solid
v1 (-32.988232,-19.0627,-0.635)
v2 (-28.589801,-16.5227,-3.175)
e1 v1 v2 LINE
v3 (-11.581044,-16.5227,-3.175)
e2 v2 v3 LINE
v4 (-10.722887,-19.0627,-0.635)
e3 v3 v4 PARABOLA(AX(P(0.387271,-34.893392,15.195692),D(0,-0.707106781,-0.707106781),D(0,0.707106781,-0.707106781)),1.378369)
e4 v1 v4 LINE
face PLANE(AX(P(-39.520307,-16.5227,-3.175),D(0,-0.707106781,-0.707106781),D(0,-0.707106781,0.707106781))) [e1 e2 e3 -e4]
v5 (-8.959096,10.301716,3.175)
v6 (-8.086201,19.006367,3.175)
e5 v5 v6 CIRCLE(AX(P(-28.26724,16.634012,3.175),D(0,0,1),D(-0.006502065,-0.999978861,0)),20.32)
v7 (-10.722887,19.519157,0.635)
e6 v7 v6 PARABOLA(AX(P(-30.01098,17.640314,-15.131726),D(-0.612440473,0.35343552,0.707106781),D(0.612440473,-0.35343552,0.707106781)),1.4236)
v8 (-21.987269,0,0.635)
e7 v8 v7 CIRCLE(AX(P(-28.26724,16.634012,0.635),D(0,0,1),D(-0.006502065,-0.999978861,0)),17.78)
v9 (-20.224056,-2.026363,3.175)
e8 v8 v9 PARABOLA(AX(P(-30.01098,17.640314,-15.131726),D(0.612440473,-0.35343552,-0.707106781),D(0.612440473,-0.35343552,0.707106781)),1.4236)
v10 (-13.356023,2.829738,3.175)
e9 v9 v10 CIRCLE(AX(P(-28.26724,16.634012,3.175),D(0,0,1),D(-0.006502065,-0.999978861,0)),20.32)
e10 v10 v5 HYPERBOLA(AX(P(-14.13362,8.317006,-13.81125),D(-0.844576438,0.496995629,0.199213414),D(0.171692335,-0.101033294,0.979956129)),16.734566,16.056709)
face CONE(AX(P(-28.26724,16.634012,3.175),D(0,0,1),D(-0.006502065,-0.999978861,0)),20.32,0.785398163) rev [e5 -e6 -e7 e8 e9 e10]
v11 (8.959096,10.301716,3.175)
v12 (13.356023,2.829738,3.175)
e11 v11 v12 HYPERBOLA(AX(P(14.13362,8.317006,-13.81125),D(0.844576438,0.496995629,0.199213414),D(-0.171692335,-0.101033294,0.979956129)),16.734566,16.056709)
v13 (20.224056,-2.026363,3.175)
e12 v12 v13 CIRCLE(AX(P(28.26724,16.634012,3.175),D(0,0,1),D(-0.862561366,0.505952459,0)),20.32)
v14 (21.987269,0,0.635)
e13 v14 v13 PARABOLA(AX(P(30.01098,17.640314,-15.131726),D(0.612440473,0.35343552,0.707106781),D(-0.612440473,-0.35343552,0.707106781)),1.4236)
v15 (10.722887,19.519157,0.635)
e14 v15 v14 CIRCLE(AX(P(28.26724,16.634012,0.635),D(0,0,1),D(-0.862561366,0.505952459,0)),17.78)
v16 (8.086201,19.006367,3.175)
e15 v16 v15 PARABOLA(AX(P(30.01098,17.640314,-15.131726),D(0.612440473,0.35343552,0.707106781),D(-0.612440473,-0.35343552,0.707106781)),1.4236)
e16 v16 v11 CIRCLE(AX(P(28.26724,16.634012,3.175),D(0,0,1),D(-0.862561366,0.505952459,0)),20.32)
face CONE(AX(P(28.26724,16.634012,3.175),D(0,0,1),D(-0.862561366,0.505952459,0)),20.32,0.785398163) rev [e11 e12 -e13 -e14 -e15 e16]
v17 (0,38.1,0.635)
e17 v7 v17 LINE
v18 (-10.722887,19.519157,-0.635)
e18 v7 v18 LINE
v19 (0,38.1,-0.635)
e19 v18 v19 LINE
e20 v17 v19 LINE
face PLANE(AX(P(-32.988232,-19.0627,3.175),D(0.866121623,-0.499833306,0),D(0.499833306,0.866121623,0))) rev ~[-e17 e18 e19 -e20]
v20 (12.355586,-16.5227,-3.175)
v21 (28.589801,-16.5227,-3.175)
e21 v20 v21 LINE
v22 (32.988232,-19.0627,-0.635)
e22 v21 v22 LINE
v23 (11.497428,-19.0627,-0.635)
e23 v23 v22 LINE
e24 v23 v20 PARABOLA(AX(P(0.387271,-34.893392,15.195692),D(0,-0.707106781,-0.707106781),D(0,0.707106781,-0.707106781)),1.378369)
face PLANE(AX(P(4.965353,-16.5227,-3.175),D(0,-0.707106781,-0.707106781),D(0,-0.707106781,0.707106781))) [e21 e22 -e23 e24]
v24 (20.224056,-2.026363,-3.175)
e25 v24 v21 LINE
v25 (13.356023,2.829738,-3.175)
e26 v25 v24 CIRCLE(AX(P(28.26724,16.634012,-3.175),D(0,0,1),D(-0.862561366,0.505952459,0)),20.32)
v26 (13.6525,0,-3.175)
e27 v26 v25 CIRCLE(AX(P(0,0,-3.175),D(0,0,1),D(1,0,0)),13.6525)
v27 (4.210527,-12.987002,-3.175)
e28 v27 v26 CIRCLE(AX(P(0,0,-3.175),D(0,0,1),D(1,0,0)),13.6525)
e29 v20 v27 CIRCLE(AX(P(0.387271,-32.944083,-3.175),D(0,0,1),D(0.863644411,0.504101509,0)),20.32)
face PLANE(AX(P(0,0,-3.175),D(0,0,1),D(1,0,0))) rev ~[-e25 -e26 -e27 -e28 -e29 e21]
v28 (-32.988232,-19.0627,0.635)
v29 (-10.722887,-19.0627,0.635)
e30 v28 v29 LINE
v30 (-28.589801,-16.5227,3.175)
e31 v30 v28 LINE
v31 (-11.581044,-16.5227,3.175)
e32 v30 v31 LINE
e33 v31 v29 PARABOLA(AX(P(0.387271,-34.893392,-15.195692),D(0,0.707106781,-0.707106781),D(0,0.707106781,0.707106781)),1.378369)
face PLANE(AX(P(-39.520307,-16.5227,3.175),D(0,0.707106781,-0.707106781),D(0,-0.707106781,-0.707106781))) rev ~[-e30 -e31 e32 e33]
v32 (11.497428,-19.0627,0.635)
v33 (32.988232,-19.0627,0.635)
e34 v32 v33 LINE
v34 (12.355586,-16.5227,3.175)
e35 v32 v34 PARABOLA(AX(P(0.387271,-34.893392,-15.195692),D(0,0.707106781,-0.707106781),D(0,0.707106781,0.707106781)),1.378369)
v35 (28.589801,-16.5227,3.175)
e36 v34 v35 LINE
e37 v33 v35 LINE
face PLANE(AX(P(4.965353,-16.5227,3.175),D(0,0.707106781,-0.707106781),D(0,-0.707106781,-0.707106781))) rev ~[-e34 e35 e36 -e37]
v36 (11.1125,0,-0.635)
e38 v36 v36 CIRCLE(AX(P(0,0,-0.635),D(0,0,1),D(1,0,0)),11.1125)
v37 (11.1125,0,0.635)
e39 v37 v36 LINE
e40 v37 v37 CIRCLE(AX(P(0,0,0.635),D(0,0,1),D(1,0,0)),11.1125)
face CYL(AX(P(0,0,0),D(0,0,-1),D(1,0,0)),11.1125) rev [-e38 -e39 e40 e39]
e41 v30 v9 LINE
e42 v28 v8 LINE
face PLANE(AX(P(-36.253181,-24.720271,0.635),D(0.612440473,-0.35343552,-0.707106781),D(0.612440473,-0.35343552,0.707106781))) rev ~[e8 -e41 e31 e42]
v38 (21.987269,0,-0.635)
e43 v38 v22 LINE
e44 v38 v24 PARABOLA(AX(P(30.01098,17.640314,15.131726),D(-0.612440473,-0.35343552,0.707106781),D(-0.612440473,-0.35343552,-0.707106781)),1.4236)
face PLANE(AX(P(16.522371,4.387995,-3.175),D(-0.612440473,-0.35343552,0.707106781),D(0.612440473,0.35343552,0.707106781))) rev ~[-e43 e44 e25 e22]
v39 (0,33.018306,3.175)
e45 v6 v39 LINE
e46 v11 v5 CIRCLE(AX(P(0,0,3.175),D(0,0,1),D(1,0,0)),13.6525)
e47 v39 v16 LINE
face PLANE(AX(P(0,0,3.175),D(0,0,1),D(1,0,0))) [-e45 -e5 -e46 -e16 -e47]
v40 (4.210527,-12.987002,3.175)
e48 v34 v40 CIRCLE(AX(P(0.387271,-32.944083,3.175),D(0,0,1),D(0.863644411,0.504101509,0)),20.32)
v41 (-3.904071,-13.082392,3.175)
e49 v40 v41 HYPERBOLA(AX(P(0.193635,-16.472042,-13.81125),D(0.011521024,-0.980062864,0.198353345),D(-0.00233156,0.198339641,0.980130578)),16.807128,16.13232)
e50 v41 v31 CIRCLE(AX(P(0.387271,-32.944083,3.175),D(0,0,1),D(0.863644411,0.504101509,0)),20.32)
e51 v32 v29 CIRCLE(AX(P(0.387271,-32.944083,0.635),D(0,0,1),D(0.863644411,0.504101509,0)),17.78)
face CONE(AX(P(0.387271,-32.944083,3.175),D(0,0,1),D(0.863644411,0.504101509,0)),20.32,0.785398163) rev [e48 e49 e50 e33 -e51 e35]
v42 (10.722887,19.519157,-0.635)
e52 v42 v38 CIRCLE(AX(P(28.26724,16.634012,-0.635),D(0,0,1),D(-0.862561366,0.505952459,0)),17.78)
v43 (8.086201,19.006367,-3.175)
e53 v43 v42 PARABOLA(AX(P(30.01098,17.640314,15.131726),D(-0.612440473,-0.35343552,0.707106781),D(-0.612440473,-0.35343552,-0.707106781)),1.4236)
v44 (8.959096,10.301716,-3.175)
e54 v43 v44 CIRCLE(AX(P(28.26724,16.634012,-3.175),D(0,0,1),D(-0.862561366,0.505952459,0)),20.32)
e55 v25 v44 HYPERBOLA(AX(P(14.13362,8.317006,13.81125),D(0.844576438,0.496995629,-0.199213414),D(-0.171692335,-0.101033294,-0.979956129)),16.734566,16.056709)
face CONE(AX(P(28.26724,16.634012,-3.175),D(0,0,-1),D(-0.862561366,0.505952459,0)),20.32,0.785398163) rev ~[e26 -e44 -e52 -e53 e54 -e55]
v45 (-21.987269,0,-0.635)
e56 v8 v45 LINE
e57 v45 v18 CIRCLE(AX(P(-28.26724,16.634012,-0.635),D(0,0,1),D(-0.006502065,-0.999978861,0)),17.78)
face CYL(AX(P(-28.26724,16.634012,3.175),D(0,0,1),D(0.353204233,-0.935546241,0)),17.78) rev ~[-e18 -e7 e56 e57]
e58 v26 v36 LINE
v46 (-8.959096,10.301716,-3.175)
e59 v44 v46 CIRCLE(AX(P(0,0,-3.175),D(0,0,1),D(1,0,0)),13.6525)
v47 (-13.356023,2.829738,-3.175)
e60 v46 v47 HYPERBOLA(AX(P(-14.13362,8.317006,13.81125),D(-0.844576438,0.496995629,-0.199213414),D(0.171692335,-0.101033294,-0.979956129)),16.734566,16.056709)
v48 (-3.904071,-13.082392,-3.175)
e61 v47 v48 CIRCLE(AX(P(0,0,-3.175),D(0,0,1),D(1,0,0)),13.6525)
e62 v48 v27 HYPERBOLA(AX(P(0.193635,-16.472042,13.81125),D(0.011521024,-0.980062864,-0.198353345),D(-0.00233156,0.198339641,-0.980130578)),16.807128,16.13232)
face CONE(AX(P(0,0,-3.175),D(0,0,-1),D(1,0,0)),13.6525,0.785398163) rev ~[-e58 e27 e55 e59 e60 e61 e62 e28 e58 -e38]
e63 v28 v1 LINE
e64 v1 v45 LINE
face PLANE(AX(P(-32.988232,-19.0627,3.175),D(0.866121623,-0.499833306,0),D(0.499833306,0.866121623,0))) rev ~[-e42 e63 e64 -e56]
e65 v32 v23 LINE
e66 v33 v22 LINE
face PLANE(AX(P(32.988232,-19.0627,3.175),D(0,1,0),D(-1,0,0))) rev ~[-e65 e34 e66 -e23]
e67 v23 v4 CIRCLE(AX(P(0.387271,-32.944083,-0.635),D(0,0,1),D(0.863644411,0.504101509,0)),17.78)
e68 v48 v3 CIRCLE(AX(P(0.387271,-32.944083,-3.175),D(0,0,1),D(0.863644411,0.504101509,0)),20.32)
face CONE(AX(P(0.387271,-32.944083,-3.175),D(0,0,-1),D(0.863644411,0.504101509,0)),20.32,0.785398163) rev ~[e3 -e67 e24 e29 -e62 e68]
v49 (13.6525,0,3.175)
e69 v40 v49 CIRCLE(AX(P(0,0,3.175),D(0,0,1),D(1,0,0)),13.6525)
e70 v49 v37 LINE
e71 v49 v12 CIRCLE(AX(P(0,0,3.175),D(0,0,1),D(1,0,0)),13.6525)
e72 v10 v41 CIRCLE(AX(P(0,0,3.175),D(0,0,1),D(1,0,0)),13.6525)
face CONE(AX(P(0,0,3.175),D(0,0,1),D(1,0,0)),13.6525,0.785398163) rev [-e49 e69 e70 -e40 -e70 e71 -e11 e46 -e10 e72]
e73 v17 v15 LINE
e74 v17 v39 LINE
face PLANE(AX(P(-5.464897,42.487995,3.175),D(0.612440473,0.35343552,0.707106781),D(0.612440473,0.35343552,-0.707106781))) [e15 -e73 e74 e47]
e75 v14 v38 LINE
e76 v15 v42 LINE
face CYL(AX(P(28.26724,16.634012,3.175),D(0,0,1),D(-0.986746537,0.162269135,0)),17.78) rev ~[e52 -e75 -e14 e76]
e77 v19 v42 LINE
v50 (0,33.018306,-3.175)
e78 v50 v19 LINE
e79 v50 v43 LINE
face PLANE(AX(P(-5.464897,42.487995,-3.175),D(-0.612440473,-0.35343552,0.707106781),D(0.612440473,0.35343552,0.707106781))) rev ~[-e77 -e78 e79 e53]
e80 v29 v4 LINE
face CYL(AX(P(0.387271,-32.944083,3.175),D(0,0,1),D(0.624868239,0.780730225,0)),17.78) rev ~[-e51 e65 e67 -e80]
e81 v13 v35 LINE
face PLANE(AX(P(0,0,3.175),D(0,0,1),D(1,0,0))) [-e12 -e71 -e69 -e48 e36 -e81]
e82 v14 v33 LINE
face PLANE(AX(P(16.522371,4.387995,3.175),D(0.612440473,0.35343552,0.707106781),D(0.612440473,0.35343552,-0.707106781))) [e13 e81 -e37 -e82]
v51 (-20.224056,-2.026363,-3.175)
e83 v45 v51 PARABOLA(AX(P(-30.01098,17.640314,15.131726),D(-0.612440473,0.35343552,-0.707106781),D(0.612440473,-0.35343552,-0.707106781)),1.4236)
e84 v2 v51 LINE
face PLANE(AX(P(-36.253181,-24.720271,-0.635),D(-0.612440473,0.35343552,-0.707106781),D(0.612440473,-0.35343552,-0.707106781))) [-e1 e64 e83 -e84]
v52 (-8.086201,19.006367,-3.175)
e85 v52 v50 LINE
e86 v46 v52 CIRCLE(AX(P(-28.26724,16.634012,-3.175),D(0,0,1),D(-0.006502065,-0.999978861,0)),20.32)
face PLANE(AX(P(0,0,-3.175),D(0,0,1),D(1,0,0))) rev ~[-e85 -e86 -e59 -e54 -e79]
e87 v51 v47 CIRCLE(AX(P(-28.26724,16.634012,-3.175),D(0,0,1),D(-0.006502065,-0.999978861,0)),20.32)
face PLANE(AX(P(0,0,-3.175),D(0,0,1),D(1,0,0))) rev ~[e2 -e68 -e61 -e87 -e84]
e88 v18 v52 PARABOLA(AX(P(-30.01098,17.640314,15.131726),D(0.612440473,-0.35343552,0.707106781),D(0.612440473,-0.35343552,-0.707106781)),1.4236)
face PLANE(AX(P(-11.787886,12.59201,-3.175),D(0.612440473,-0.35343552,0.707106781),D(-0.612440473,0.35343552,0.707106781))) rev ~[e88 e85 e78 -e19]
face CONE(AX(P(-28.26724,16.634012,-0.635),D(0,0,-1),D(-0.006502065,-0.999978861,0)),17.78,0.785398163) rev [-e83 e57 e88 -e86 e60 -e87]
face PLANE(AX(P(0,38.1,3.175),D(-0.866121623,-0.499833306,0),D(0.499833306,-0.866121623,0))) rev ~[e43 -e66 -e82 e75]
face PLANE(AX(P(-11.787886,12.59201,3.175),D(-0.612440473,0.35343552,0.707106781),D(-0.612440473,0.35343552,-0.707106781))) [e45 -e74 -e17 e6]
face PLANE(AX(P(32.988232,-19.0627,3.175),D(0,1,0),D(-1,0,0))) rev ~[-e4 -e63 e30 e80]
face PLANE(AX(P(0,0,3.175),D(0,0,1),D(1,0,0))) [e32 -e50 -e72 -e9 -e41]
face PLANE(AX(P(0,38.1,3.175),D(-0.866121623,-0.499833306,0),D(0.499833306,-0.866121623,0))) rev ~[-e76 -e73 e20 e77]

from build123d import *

# Parameters (mm, degrees)
F0_R          = 38.1
F0_R_2        = 11.1125
F1_DEPTH      = 3.175
F1_DEPTH_BACK = 3.175
F3_DEPTH      = 25.4
F5_DEPTH      = 25.4
F6_T1_DEPTH   = 34.5170750052
F6_T3_DEPTH   = 35.0734141938
F6_T5_DEPTH   = 34.5549539208
F6_T7_DEPTH   = 35.3294952256
F6_T9_DEPTH   = 35.0734141938
F6_T11_DEPTH  = 34.5170750052
F6_T14_ANGLE  = 120.7671426779
F6_T16_ANGLE  = 119.4565466951
F6_T18_ANGLE  = 120.7671426779
F6_T22_ANGLE  = 120.7671426779
F6_T24_ANGLE  = 119.4565466951
F6_T26_ANGLE  = 120.7671426779


# Not quite as in the source:
# - a fillet or chamfer that OpenCascade refuses, or shapes differently, is made with other operations: its cross-section is extruded or revolved along the edge and cut away or added


with BuildPart() as f1:
    # F0 (on Top) → F1 (new body, two sides)
    with BuildSketch(Plane.XY) as f1_sk:
        Circle(F0_R)
        Circle(F0_R_2, mode=Mode.SUBTRACT)
    extrude(amount=F1_DEPTH)
    extrude(f1_sk.sketch, amount=-F1_DEPTH_BACK)

    # F2 (on face) → F3 (cut)
    with BuildSketch(Plane.XY.offset(3.175)):
        with BuildLine():
            Line((-32.9882322762, -19.0627), (0, 38.1))
            ThreePointArc((0, 38.1), (-32.9992338547, 19.0436489413), (-32.9882322762, -19.0627))
        make_face()
        with BuildLine():
            Line((32.9882322762, -19.0627), (-32.9882322762, -19.0627))
            ThreePointArc((-32.9882322762, -19.0627), (0, -38.1), (32.9882322762, -19.0627))
        make_face()
        with BuildLine():
            ThreePointArc((38.1, 0), (26.9407683632, 26.9407683632), (0, 38.1))
            Line((0, 38.1), (32.9882322762, -19.0627))
            ThreePointArc((32.9882322762, -19.0627), (36.7998753376, -9.8680887277), (38.1, 0))
        make_face()
    extrude(amount=-F3_DEPTH, mode=Mode.SUBTRACT)

    # F4 (on face) → F5 (cut)
    with BuildSketch(Plane.XY.offset(3.175)):
        with BuildLine():
            Line((-10.7228866295, 19.5191574013), (-21.9872687911, 0))
            ThreePointArc((-21.9872687911, 0), (-12.8675975863, 7.7469760001), (-10.7228866295, 19.5191574013))
        make_face()
        with BuildLine():
            Line((21.9872687911, 0), (10.7228866295, 19.5191574013))
            ThreePointArc((10.7228866295, 19.5191574013), (12.8675975863, 7.7469760001), (21.9872687911, 0))
        make_face()
        with BuildLine():
            ThreePointArc((11.4974279343, -19.0627), (0.3872706524, -15.1640834027), (-10.7228866295, -19.0627))
            Line((-10.7228866295, -19.0627), (11.4974279343, -19.0627))
        make_face()
    extrude(amount=-F5_DEPTH, mode=Mode.SUBTRACT)

    # F6: chamfer of 2.54 on 20 edges, made by hand

    # F6_s2 → F6_t1 (cut)
    with BuildSketch(Plane(origin=(-19.7590646722, 34.2389212213, 0), x_dir=(0, 0, 1), z_dir=(0.4998333055, -0.8661216235, 0))):
        Polygon((3.175, -16.5036489413), (0.635, -19.0436489413), (3.175, -19.0436489413), align=None)
        Polygon((-3.175, -16.5036489413), (-0.635, -19.0436489413), (-3.175, -19.0436489413), align=None)
    extrude(amount=F6_T1_DEPTH, mode=Mode.SUBTRACT)

    # F6_s4 → F6_t3 (cut)
    with BuildSketch(Plane(origin=(2.2282041189, -3.8610787787, 0), x_dir=(0, 0, 1), z_dir=(0.4998333055, -0.8661216235, 0))):
        Polygon((3.175, -16.5036489413), (0.635, -19.0436489413), (3.175, -19.0436489413), align=None)
        Polygon((-3.175, -16.5036489413), (-0.635, -19.0436489413), (-3.175, -19.0436489413), align=None)
    extrude(amount=F6_T3_DEPTH, mode=Mode.SUBTRACT)

    # F6_s6 → F6_t5 (cut)
    with BuildSketch(Plane.YZ.offset(4.9653531448)):
        Polygon((-16.5227, 3.175), (-19.0627, 0.635), (-19.0627, 3.175), align=None)
        Polygon((-16.5227, -3.175), (-19.0627, -0.635), (-19.0627, -3.175), align=None)
    extrude(amount=F6_T5_DEPTH, mode=Mode.SUBTRACT)

    # F6_s8 → F6_t7 (cut)
    with BuildSketch(Plane.YZ.offset(-39.5203070657)):
        Polygon((-16.5227, 3.175), (-19.0627, 0.635), (-19.0627, 3.175), align=None)
        Polygon((-16.5227, -3.175), (-19.0627, -0.635), (-19.0627, -3.175), align=None)
    extrude(amount=F6_T7_DEPTH, mode=Mode.SUBTRACT)

    # F6_s10 → F6_t9 (cut)
    with BuildSketch(Plane(origin=(-19.7590646722, -34.2389212213, 0), x_dir=(0, 0, 1), z_dir=(0.4998333055, 0.8661216235, 0))):
        Polygon((0.635, -19.0436489413), (3.175, -16.5036489413), (3.175, -19.0436489413), align=None)
        Polygon((-0.635, -19.0436489413), (-3.175, -16.5036489413), (-3.175, -19.0436489413), align=None)
    extrude(amount=F6_T9_DEPTH, mode=Mode.SUBTRACT)

    # F6_s12 → F6_t11 (cut)
    with BuildSketch(Plane(origin=(2.5062809746, 4.3429361799, 0), x_dir=(0, 0, 1), z_dir=(0.4998333055, 0.8661216235, 0))):
        Polygon((3.175, -16.5036489413), (0.635, -19.0436489413), (3.175, -19.0436489413), align=None)
        Polygon((-3.175, -16.5036489413), (-0.635, -19.0436489413), (-3.175, -19.0436489413), align=None)
    extrude(amount=F6_T11_DEPTH, mode=Mode.SUBTRACT)

    # F6_s13 → F6_t14 (revolve, cut)
    with BuildSketch(Plane(origin=(14.4954043102, 24.71215529, 0), x_dir=(0, 0, 1), z_dir=(0.505952459, 0.8625613655, 0))):
        Polygon((3.175, -4.353790183), (0.635, -1.813790183), (3.175, -1.813790183), align=None)
    revolve(axis=Axis((28.2672400519, 16.6340121728, 3.175), (0, 0, 1)), revolution_arc=F6_T14_ANGLE, mode=Mode.SUBTRACT)

    # F6_s15 → F6_t16 (revolve, cut)
    with BuildSketch(Plane(origin=(14.4410953434, -24.7409917864, 0), x_dir=(0, 0, 1), z_dir=(0.5041015086, -0.8636444112, 0))):
        Polygon((3.175, -4.0473019905), (0.635, -1.5073019905), (3.175, -1.5073019905), align=None)
    revolve(axis=Axis((0.3872706524, -32.9440834027, 3.175), (0, 0, 1)), revolution_arc=F6_T16_ANGLE, mode=Mode.SUBTRACT)

    # F6_s17 → F6_t18 (revolve, cut)
    with BuildSketch(Plane(origin=(-28.374198152, 0.1844947944, 0), x_dir=(0, 0, 1), z_dir=(-0.9999788613, 0.0065020655, 0))):
        Polygon((3.175, -3.8701348937), (0.635, -1.3301348937), (3.175, -1.3301348937), align=None)
    revolve(axis=Axis((-28.2672400519, 16.6340121728, 3.175), (0, 0, 1)), revolution_arc=F6_T18_ANGLE, mode=Mode.SUBTRACT)

    # F6_s19 → F6_t20 (revolve, cut)
    with BuildSketch(Plane.XZ):
        Polygon((13.6525, 3.175), (11.1125, 0.635), (11.1125, 3.175), align=None)
    revolve(axis=Axis((0, 0, 3.175), (0, 0, 1)), mode=Mode.SUBTRACT)

    # F6_s21 → F6_t22 (revolve, cut)
    with BuildSketch(Plane(origin=(14.4954043102, 24.71215529, 0), x_dir=(0, 0, 1), z_dir=(0.505952459, 0.8625613655, 0))):
        Polygon((-3.175, -4.353790183), (-0.635, -1.813790183), (-3.175, -1.813790183), align=None)
    revolve(axis=Axis((28.2672400519, 16.6340121728, -3.175), (0, 0, 1)), revolution_arc=F6_T22_ANGLE, mode=Mode.SUBTRACT)

    # F6_s23 → F6_t24 (revolve, cut)
    with BuildSketch(Plane(origin=(14.4410953434, -24.7409917864, 0), x_dir=(0, 0, 1), z_dir=(0.5041015086, -0.8636444112, 0))):
        Polygon((-3.175, -4.0473019905), (-0.635, -1.5073019905), (-3.175, -1.5073019905), align=None)
    revolve(axis=Axis((0.3872706524, -32.9440834027, -3.175), (0, 0, 1)), revolution_arc=F6_T24_ANGLE, mode=Mode.SUBTRACT)

    # F6_s25 → F6_t26 (revolve, cut)
    with BuildSketch(Plane(origin=(-28.374198152, 0.1844947944, 0), x_dir=(0, 0, 1), z_dir=(-0.9999788613, 0.0065020655, 0))):
        Polygon((-0.635, -1.3301348937), (-3.175, -3.8701348937), (-3.175, -1.3301348937), align=None)
    revolve(axis=Axis((-28.2672400519, 16.6340121728, -3.175), (0, 0, 1)), revolution_arc=F6_T26_ANGLE, mode=Mode.SUBTRACT)

    # F6_s27 → F6_t28 (revolve, cut)
    with BuildSketch(Plane.XZ):
        Polygon((13.6525, -3.175), (11.1125, -0.635), (11.1125, -3.175), align=None)
    revolve(axis=Axis((0, 0, -3.175), (0, 0, 1)), mode=Mode.SUBTRACT)


solid = f1.part
